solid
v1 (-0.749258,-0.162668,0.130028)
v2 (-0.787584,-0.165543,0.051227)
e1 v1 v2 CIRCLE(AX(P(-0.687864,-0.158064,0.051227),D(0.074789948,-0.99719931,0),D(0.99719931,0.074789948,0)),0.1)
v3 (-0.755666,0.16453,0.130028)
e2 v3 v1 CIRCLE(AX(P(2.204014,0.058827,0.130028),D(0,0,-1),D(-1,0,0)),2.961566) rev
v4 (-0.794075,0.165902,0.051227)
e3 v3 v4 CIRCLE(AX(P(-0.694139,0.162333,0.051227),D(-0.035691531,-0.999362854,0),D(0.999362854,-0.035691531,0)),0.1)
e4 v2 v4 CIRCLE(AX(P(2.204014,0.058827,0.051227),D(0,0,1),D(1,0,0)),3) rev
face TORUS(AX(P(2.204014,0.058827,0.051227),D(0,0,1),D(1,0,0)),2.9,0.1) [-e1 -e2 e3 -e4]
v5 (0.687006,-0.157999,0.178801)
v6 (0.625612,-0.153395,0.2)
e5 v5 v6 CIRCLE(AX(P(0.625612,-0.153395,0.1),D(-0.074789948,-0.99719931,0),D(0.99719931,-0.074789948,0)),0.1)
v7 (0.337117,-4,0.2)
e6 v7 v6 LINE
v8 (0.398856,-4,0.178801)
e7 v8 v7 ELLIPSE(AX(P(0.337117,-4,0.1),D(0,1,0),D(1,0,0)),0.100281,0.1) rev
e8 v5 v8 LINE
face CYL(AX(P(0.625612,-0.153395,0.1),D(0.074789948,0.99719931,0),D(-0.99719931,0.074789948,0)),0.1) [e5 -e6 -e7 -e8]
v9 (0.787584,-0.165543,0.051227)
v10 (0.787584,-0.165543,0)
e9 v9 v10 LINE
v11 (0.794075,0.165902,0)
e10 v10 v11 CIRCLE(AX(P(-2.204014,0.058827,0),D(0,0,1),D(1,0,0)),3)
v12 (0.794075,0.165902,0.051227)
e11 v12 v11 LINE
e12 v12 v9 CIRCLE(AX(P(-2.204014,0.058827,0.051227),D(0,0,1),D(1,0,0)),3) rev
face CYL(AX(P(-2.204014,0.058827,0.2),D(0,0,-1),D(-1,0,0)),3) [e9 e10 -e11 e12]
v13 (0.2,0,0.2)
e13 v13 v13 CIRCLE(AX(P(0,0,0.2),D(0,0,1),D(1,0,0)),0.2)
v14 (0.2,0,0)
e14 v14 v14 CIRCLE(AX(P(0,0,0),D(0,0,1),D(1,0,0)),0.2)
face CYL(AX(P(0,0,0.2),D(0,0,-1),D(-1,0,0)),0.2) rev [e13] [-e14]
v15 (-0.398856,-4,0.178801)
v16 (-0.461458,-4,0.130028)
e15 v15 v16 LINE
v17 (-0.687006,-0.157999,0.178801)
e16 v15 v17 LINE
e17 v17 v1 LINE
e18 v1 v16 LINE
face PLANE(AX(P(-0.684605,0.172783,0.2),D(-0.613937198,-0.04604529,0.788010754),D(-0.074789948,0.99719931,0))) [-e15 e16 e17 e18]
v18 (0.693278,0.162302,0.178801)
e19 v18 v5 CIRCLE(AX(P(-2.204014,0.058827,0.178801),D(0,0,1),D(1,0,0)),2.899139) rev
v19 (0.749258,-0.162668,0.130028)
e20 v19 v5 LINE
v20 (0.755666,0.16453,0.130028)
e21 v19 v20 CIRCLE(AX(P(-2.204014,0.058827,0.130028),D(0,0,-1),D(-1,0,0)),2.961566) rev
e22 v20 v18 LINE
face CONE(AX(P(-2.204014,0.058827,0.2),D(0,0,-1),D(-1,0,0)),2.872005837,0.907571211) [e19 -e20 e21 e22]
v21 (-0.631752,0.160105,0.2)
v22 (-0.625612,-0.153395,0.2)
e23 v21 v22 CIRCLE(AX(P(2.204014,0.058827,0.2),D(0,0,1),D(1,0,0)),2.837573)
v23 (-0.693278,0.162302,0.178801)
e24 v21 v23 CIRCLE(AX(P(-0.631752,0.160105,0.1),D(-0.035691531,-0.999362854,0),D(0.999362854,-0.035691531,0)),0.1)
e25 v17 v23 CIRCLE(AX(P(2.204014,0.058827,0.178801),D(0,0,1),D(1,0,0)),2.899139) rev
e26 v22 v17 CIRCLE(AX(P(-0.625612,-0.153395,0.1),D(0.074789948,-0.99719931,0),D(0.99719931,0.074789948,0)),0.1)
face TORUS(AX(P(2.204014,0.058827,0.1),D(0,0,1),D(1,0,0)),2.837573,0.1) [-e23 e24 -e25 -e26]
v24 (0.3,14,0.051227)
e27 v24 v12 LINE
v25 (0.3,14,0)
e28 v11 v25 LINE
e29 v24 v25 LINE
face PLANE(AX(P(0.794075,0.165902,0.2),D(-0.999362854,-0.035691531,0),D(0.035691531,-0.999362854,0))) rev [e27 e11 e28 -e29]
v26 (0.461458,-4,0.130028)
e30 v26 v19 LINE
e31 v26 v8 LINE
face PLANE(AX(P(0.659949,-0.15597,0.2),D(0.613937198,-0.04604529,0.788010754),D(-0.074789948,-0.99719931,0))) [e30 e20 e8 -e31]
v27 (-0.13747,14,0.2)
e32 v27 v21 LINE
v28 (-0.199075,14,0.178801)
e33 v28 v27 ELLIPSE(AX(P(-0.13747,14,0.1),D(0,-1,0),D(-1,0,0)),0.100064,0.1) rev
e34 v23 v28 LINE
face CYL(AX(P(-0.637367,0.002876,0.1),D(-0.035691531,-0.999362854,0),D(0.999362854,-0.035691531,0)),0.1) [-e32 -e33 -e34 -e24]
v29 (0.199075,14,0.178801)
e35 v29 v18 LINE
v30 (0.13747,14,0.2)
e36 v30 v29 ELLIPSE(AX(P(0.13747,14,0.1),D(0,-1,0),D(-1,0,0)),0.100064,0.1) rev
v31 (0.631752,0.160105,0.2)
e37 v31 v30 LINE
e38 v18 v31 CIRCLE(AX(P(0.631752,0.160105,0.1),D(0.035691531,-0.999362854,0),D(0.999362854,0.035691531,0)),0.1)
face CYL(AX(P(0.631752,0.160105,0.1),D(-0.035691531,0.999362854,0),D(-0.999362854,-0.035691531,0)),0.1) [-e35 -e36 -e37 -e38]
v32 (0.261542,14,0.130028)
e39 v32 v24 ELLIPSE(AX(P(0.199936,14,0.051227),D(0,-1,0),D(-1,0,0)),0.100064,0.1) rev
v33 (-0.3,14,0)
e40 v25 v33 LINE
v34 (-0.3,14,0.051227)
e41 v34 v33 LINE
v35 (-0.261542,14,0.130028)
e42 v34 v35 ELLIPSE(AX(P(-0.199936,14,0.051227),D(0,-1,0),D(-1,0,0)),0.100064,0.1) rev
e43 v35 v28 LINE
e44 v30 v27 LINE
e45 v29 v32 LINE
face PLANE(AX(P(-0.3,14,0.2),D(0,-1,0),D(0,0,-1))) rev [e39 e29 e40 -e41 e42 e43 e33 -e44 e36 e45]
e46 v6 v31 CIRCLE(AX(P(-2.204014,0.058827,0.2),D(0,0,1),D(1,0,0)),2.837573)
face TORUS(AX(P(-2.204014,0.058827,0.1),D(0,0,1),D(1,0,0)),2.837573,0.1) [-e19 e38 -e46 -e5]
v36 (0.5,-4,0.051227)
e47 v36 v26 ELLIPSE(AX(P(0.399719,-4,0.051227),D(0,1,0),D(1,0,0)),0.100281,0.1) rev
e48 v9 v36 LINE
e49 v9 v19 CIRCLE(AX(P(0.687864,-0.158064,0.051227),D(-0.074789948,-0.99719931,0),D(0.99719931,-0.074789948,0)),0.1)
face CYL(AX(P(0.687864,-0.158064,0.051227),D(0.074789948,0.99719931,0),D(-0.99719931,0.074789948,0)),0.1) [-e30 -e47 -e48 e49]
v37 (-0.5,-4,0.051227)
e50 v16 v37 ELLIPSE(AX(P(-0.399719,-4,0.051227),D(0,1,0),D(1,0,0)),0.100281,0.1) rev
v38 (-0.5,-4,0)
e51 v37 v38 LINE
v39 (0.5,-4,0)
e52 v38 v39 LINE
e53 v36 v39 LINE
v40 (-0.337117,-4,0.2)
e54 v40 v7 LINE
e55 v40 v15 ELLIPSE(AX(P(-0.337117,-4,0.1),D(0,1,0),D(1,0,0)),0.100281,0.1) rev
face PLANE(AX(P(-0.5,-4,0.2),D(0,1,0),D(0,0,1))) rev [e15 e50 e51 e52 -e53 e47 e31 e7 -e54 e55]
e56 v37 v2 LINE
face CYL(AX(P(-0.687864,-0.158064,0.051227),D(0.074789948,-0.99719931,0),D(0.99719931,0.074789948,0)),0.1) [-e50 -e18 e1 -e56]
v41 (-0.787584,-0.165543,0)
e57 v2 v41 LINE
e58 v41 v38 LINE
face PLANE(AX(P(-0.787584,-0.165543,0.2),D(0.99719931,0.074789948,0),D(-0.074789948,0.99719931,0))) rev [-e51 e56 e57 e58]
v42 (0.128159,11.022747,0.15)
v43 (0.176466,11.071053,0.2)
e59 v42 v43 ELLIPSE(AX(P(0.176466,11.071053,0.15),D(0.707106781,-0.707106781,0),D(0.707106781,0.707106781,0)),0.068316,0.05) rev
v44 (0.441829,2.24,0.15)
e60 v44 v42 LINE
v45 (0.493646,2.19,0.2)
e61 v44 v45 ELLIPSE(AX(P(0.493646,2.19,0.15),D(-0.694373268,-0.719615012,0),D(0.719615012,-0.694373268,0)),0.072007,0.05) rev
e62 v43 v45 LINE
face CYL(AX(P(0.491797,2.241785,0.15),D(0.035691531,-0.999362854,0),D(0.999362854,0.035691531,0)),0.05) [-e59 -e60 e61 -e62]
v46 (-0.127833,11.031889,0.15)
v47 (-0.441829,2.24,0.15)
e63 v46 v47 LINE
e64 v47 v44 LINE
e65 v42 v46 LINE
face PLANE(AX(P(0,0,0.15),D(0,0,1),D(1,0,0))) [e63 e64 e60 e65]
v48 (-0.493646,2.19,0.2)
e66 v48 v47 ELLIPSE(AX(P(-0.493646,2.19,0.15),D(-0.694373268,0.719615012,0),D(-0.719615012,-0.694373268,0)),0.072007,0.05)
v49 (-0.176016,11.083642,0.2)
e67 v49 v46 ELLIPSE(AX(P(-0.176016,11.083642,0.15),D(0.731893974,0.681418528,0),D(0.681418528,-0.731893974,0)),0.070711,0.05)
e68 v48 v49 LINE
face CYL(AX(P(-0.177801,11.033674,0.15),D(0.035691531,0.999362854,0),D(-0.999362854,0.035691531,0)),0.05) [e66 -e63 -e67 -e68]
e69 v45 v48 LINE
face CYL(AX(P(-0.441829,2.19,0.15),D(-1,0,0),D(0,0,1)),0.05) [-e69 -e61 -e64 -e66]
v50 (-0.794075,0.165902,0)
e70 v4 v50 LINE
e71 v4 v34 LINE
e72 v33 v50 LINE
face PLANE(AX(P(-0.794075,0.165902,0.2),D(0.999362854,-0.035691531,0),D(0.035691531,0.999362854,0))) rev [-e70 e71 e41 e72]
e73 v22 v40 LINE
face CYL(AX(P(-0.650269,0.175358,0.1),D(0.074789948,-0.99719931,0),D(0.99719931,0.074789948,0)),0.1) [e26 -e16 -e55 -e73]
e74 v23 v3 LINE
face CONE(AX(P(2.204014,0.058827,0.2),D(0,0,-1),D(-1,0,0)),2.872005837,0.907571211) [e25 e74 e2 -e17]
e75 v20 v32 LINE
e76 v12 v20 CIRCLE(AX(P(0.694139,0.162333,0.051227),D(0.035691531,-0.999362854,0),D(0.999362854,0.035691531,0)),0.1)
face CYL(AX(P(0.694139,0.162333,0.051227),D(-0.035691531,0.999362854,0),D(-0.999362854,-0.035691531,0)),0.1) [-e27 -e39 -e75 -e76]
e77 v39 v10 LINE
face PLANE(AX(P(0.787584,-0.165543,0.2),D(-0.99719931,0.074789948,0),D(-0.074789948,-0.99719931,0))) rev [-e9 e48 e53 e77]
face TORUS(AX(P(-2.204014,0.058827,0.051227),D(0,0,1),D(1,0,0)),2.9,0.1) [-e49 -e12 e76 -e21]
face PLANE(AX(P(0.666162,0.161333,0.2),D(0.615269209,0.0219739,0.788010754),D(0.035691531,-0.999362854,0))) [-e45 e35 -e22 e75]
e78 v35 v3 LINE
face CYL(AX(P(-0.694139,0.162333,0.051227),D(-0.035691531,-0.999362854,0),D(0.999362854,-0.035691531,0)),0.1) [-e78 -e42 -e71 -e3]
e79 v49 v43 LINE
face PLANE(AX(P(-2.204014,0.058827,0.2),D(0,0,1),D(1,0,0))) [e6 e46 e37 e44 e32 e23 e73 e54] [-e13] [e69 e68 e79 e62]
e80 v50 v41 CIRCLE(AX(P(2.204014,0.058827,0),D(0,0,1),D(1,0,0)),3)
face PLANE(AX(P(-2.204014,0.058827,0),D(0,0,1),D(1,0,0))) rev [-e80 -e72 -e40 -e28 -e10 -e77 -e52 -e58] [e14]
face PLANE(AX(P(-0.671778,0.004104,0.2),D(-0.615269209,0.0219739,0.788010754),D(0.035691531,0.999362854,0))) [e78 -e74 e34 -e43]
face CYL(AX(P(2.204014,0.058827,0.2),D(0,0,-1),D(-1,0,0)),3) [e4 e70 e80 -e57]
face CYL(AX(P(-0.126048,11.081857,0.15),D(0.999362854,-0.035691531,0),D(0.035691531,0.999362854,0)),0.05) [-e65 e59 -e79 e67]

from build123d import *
from OCP.BRepFilletAPI import BRepFilletAPI_MakeChamfer

# Parameters (mm, degrees)
SKETCH_1_R          = 0.2
EXTRUDE_1_DEPTH     = 0.2
CHAMFER_1_SIZE      = 0.1
CHAMFER_1_SIZE2     = 0.127994163
CUT_EXTRUDE_1_DEPTH = 0.05
FILLET_1_R          = 0.1
FILLET_2_R          = 0.05


with BuildPart() as part:
    # Эскиз1 → Бобышка-Вытянуть1 (new body)
    with BuildSketch(Plane.XY):
        with BuildLine():
            Line((-0.794074936, 0.165901801), (-0.3, 14))
            Line((-0.3, 14), (0.3, 14))
            Line((0.3, 14), (0.794074936, 0.165901801))
            ThreePointArc((0.794074936, 0.165901801), (0.795411305, 8.986e-05), (0.787584302, -0.165542636))
            Line((0.787584302, -0.165542636), (0.5, -4))
            Line((0.5, -4), (-0.5, -4))
            Line((-0.5, -4), (-0.787584302, -0.165542636))
            ThreePointArc((-0.787584302, -0.165542636), (-0.795411305, 8.986e-05), (-0.794074936, 0.165901801))
        make_face()
        Circle(SKETCH_1_R, mode=Mode.SUBTRACT)
    extrude(amount=EXTRUDE_1_DEPTH)

    # Фаска1: one chamfer whose edges measure the first distance from different faces: ONE call of the kernel's chamfer builder (chamfer() names one face for all edges)
    chamfer_1_edges_1 = [part.edges().sort_by_distance(p)[0] for p in [
        (-0.795411305, 8.986e-05, 0.2),
    ]]
    chamfer_1_side_1 = [part.faces().sort_by_distance(p)[0] for p in [
        (-0.795411305, 8.986e-05, 0.1),
    ]]
    chamfer_1_edges_2 = [part.edges().sort_by_distance(p)[0] for p in [
        (-0.643792151, -2.082771318, 0.2),
    ]]
    chamfer_1_side_2 = [part.faces().sort_by_distance(p)[0] for p in [
        (-0.643792151, -2.082771318, 0.1),
    ]]
    chamfer_1_edges_3 = [part.edges().sort_by_distance(p)[0] for p in [
        (0.643792151, -2.082771318, 0.2),
    ]]
    chamfer_1_side_3 = [part.faces().sort_by_distance(p)[0] for p in [
        (0.643792151, -2.082771318, 0.1),
    ]]
    chamfer_1_edges_4 = [part.edges().sort_by_distance(p)[0] for p in [
        (0.795411305, 8.986e-05, 0.2),
    ]]
    chamfer_1_side_4 = [part.faces().sort_by_distance(p)[0] for p in [
        (0.795411305, 8.986e-05, 0.1),
    ]]
    chamfer_1_edges_5 = [part.edges().sort_by_distance(p)[0] for p in [
        (0.547037468, 7.0829509, 0.2),
    ]]
    chamfer_1_side_5 = [part.faces().sort_by_distance(p)[0] for p in [
        (0.547037468, 7.0829509, 0.1),
    ]]
    chamfer_1_edges_6 = [part.edges().sort_by_distance(p)[0] for p in [
        (-0.547037468, 7.0829509, 0.2),
    ]]
    chamfer_1_side_6 = [part.faces().sort_by_distance(p)[0] for p in [
        (-0.547037468, 7.0829509, 0.1),
    ]]
    chamfer_1 = BRepFilletAPI_MakeChamfer(part.part.solid().wrapped)
    for e in chamfer_1_edges_1:
        chamfer_1.Add(CHAMFER_1_SIZE, CHAMFER_1_SIZE2, e.wrapped, chamfer_1_side_1[0].wrapped)  # the first distance lies on this face
    for e in chamfer_1_edges_2:
        chamfer_1.Add(CHAMFER_1_SIZE, CHAMFER_1_SIZE2, e.wrapped, chamfer_1_side_2[0].wrapped)  # the first distance lies on this face
    for e in chamfer_1_edges_3:
        chamfer_1.Add(CHAMFER_1_SIZE, CHAMFER_1_SIZE2, e.wrapped, chamfer_1_side_3[0].wrapped)  # the first distance lies on this face
    for e in chamfer_1_edges_4:
        chamfer_1.Add(CHAMFER_1_SIZE, CHAMFER_1_SIZE2, e.wrapped, chamfer_1_side_4[0].wrapped)  # the first distance lies on this face
    for e in chamfer_1_edges_5:
        chamfer_1.Add(CHAMFER_1_SIZE, CHAMFER_1_SIZE2, e.wrapped, chamfer_1_side_5[0].wrapped)  # the first distance lies on this face
    for e in chamfer_1_edges_6:
        chamfer_1.Add(CHAMFER_1_SIZE, CHAMFER_1_SIZE2, e.wrapped, chamfer_1_side_6[0].wrapped)  # the first distance lies on this face
    add(Compound.cast(chamfer_1.Shape()), mode=Mode.REPLACE)

    # Эскиз2 → Вырез-Вытянуть1 (cut)
    with BuildSketch(Plane.XY.offset(0.2)):
        Polygon((-0.127832554, 11.03188933), (-0.441828601, 2.24), (0.441828601, 2.24), (0.128159074, 11.022746772), align=None)
    extrude(amount=-CUT_EXTRUDE_1_DEPTH, mode=Mode.SUBTRACT)

    # Скругление1
    fillet_1_edges = [part.edges().sort_by_distance(p)[0] for p in [
        (-0.419043279, 7.080666746, 0.2),
        (-0.667441677, 0.002595872, 0.2),
        (-0.515797485, -2.077984979, 0.2),
        (0.419043279, 7.080666746, 0.2),
        (0.667441677, 0.002595872, 0.2),
        (0.515797485, -2.077984979, 0.2),
        (0.643792151, -2.082771318, 0.1),
        (0.795411305, 8.986e-05, 0.1),
        (0.547037468, 7.0829509, 0.1),
        (-0.643792151, -2.082771318, 0.1),
        (-0.795411305, 8.986e-05, 0.1),
        (-0.547037468, 7.0829509, 0.1),
    ]]
    fillet(fillet_1_edges, radius=FILLET_1_R)

    # Скругление2
    fillet_2_edges = [part.edges().sort_by_distance(p)[0] for p in [
        (0.00016326, 11.027318051, 0.2),
        (0.284993837, 6.631373386, 0.2),
        (0, 2.24, 0.2),
        (-0.284830577, 6.635944665, 0.2),
    ]]
    fillet(fillet_2_edges, radius=FILLET_2_R - 0.0001)  # a hair under: the kernel refuses the full size


solid = part.part
